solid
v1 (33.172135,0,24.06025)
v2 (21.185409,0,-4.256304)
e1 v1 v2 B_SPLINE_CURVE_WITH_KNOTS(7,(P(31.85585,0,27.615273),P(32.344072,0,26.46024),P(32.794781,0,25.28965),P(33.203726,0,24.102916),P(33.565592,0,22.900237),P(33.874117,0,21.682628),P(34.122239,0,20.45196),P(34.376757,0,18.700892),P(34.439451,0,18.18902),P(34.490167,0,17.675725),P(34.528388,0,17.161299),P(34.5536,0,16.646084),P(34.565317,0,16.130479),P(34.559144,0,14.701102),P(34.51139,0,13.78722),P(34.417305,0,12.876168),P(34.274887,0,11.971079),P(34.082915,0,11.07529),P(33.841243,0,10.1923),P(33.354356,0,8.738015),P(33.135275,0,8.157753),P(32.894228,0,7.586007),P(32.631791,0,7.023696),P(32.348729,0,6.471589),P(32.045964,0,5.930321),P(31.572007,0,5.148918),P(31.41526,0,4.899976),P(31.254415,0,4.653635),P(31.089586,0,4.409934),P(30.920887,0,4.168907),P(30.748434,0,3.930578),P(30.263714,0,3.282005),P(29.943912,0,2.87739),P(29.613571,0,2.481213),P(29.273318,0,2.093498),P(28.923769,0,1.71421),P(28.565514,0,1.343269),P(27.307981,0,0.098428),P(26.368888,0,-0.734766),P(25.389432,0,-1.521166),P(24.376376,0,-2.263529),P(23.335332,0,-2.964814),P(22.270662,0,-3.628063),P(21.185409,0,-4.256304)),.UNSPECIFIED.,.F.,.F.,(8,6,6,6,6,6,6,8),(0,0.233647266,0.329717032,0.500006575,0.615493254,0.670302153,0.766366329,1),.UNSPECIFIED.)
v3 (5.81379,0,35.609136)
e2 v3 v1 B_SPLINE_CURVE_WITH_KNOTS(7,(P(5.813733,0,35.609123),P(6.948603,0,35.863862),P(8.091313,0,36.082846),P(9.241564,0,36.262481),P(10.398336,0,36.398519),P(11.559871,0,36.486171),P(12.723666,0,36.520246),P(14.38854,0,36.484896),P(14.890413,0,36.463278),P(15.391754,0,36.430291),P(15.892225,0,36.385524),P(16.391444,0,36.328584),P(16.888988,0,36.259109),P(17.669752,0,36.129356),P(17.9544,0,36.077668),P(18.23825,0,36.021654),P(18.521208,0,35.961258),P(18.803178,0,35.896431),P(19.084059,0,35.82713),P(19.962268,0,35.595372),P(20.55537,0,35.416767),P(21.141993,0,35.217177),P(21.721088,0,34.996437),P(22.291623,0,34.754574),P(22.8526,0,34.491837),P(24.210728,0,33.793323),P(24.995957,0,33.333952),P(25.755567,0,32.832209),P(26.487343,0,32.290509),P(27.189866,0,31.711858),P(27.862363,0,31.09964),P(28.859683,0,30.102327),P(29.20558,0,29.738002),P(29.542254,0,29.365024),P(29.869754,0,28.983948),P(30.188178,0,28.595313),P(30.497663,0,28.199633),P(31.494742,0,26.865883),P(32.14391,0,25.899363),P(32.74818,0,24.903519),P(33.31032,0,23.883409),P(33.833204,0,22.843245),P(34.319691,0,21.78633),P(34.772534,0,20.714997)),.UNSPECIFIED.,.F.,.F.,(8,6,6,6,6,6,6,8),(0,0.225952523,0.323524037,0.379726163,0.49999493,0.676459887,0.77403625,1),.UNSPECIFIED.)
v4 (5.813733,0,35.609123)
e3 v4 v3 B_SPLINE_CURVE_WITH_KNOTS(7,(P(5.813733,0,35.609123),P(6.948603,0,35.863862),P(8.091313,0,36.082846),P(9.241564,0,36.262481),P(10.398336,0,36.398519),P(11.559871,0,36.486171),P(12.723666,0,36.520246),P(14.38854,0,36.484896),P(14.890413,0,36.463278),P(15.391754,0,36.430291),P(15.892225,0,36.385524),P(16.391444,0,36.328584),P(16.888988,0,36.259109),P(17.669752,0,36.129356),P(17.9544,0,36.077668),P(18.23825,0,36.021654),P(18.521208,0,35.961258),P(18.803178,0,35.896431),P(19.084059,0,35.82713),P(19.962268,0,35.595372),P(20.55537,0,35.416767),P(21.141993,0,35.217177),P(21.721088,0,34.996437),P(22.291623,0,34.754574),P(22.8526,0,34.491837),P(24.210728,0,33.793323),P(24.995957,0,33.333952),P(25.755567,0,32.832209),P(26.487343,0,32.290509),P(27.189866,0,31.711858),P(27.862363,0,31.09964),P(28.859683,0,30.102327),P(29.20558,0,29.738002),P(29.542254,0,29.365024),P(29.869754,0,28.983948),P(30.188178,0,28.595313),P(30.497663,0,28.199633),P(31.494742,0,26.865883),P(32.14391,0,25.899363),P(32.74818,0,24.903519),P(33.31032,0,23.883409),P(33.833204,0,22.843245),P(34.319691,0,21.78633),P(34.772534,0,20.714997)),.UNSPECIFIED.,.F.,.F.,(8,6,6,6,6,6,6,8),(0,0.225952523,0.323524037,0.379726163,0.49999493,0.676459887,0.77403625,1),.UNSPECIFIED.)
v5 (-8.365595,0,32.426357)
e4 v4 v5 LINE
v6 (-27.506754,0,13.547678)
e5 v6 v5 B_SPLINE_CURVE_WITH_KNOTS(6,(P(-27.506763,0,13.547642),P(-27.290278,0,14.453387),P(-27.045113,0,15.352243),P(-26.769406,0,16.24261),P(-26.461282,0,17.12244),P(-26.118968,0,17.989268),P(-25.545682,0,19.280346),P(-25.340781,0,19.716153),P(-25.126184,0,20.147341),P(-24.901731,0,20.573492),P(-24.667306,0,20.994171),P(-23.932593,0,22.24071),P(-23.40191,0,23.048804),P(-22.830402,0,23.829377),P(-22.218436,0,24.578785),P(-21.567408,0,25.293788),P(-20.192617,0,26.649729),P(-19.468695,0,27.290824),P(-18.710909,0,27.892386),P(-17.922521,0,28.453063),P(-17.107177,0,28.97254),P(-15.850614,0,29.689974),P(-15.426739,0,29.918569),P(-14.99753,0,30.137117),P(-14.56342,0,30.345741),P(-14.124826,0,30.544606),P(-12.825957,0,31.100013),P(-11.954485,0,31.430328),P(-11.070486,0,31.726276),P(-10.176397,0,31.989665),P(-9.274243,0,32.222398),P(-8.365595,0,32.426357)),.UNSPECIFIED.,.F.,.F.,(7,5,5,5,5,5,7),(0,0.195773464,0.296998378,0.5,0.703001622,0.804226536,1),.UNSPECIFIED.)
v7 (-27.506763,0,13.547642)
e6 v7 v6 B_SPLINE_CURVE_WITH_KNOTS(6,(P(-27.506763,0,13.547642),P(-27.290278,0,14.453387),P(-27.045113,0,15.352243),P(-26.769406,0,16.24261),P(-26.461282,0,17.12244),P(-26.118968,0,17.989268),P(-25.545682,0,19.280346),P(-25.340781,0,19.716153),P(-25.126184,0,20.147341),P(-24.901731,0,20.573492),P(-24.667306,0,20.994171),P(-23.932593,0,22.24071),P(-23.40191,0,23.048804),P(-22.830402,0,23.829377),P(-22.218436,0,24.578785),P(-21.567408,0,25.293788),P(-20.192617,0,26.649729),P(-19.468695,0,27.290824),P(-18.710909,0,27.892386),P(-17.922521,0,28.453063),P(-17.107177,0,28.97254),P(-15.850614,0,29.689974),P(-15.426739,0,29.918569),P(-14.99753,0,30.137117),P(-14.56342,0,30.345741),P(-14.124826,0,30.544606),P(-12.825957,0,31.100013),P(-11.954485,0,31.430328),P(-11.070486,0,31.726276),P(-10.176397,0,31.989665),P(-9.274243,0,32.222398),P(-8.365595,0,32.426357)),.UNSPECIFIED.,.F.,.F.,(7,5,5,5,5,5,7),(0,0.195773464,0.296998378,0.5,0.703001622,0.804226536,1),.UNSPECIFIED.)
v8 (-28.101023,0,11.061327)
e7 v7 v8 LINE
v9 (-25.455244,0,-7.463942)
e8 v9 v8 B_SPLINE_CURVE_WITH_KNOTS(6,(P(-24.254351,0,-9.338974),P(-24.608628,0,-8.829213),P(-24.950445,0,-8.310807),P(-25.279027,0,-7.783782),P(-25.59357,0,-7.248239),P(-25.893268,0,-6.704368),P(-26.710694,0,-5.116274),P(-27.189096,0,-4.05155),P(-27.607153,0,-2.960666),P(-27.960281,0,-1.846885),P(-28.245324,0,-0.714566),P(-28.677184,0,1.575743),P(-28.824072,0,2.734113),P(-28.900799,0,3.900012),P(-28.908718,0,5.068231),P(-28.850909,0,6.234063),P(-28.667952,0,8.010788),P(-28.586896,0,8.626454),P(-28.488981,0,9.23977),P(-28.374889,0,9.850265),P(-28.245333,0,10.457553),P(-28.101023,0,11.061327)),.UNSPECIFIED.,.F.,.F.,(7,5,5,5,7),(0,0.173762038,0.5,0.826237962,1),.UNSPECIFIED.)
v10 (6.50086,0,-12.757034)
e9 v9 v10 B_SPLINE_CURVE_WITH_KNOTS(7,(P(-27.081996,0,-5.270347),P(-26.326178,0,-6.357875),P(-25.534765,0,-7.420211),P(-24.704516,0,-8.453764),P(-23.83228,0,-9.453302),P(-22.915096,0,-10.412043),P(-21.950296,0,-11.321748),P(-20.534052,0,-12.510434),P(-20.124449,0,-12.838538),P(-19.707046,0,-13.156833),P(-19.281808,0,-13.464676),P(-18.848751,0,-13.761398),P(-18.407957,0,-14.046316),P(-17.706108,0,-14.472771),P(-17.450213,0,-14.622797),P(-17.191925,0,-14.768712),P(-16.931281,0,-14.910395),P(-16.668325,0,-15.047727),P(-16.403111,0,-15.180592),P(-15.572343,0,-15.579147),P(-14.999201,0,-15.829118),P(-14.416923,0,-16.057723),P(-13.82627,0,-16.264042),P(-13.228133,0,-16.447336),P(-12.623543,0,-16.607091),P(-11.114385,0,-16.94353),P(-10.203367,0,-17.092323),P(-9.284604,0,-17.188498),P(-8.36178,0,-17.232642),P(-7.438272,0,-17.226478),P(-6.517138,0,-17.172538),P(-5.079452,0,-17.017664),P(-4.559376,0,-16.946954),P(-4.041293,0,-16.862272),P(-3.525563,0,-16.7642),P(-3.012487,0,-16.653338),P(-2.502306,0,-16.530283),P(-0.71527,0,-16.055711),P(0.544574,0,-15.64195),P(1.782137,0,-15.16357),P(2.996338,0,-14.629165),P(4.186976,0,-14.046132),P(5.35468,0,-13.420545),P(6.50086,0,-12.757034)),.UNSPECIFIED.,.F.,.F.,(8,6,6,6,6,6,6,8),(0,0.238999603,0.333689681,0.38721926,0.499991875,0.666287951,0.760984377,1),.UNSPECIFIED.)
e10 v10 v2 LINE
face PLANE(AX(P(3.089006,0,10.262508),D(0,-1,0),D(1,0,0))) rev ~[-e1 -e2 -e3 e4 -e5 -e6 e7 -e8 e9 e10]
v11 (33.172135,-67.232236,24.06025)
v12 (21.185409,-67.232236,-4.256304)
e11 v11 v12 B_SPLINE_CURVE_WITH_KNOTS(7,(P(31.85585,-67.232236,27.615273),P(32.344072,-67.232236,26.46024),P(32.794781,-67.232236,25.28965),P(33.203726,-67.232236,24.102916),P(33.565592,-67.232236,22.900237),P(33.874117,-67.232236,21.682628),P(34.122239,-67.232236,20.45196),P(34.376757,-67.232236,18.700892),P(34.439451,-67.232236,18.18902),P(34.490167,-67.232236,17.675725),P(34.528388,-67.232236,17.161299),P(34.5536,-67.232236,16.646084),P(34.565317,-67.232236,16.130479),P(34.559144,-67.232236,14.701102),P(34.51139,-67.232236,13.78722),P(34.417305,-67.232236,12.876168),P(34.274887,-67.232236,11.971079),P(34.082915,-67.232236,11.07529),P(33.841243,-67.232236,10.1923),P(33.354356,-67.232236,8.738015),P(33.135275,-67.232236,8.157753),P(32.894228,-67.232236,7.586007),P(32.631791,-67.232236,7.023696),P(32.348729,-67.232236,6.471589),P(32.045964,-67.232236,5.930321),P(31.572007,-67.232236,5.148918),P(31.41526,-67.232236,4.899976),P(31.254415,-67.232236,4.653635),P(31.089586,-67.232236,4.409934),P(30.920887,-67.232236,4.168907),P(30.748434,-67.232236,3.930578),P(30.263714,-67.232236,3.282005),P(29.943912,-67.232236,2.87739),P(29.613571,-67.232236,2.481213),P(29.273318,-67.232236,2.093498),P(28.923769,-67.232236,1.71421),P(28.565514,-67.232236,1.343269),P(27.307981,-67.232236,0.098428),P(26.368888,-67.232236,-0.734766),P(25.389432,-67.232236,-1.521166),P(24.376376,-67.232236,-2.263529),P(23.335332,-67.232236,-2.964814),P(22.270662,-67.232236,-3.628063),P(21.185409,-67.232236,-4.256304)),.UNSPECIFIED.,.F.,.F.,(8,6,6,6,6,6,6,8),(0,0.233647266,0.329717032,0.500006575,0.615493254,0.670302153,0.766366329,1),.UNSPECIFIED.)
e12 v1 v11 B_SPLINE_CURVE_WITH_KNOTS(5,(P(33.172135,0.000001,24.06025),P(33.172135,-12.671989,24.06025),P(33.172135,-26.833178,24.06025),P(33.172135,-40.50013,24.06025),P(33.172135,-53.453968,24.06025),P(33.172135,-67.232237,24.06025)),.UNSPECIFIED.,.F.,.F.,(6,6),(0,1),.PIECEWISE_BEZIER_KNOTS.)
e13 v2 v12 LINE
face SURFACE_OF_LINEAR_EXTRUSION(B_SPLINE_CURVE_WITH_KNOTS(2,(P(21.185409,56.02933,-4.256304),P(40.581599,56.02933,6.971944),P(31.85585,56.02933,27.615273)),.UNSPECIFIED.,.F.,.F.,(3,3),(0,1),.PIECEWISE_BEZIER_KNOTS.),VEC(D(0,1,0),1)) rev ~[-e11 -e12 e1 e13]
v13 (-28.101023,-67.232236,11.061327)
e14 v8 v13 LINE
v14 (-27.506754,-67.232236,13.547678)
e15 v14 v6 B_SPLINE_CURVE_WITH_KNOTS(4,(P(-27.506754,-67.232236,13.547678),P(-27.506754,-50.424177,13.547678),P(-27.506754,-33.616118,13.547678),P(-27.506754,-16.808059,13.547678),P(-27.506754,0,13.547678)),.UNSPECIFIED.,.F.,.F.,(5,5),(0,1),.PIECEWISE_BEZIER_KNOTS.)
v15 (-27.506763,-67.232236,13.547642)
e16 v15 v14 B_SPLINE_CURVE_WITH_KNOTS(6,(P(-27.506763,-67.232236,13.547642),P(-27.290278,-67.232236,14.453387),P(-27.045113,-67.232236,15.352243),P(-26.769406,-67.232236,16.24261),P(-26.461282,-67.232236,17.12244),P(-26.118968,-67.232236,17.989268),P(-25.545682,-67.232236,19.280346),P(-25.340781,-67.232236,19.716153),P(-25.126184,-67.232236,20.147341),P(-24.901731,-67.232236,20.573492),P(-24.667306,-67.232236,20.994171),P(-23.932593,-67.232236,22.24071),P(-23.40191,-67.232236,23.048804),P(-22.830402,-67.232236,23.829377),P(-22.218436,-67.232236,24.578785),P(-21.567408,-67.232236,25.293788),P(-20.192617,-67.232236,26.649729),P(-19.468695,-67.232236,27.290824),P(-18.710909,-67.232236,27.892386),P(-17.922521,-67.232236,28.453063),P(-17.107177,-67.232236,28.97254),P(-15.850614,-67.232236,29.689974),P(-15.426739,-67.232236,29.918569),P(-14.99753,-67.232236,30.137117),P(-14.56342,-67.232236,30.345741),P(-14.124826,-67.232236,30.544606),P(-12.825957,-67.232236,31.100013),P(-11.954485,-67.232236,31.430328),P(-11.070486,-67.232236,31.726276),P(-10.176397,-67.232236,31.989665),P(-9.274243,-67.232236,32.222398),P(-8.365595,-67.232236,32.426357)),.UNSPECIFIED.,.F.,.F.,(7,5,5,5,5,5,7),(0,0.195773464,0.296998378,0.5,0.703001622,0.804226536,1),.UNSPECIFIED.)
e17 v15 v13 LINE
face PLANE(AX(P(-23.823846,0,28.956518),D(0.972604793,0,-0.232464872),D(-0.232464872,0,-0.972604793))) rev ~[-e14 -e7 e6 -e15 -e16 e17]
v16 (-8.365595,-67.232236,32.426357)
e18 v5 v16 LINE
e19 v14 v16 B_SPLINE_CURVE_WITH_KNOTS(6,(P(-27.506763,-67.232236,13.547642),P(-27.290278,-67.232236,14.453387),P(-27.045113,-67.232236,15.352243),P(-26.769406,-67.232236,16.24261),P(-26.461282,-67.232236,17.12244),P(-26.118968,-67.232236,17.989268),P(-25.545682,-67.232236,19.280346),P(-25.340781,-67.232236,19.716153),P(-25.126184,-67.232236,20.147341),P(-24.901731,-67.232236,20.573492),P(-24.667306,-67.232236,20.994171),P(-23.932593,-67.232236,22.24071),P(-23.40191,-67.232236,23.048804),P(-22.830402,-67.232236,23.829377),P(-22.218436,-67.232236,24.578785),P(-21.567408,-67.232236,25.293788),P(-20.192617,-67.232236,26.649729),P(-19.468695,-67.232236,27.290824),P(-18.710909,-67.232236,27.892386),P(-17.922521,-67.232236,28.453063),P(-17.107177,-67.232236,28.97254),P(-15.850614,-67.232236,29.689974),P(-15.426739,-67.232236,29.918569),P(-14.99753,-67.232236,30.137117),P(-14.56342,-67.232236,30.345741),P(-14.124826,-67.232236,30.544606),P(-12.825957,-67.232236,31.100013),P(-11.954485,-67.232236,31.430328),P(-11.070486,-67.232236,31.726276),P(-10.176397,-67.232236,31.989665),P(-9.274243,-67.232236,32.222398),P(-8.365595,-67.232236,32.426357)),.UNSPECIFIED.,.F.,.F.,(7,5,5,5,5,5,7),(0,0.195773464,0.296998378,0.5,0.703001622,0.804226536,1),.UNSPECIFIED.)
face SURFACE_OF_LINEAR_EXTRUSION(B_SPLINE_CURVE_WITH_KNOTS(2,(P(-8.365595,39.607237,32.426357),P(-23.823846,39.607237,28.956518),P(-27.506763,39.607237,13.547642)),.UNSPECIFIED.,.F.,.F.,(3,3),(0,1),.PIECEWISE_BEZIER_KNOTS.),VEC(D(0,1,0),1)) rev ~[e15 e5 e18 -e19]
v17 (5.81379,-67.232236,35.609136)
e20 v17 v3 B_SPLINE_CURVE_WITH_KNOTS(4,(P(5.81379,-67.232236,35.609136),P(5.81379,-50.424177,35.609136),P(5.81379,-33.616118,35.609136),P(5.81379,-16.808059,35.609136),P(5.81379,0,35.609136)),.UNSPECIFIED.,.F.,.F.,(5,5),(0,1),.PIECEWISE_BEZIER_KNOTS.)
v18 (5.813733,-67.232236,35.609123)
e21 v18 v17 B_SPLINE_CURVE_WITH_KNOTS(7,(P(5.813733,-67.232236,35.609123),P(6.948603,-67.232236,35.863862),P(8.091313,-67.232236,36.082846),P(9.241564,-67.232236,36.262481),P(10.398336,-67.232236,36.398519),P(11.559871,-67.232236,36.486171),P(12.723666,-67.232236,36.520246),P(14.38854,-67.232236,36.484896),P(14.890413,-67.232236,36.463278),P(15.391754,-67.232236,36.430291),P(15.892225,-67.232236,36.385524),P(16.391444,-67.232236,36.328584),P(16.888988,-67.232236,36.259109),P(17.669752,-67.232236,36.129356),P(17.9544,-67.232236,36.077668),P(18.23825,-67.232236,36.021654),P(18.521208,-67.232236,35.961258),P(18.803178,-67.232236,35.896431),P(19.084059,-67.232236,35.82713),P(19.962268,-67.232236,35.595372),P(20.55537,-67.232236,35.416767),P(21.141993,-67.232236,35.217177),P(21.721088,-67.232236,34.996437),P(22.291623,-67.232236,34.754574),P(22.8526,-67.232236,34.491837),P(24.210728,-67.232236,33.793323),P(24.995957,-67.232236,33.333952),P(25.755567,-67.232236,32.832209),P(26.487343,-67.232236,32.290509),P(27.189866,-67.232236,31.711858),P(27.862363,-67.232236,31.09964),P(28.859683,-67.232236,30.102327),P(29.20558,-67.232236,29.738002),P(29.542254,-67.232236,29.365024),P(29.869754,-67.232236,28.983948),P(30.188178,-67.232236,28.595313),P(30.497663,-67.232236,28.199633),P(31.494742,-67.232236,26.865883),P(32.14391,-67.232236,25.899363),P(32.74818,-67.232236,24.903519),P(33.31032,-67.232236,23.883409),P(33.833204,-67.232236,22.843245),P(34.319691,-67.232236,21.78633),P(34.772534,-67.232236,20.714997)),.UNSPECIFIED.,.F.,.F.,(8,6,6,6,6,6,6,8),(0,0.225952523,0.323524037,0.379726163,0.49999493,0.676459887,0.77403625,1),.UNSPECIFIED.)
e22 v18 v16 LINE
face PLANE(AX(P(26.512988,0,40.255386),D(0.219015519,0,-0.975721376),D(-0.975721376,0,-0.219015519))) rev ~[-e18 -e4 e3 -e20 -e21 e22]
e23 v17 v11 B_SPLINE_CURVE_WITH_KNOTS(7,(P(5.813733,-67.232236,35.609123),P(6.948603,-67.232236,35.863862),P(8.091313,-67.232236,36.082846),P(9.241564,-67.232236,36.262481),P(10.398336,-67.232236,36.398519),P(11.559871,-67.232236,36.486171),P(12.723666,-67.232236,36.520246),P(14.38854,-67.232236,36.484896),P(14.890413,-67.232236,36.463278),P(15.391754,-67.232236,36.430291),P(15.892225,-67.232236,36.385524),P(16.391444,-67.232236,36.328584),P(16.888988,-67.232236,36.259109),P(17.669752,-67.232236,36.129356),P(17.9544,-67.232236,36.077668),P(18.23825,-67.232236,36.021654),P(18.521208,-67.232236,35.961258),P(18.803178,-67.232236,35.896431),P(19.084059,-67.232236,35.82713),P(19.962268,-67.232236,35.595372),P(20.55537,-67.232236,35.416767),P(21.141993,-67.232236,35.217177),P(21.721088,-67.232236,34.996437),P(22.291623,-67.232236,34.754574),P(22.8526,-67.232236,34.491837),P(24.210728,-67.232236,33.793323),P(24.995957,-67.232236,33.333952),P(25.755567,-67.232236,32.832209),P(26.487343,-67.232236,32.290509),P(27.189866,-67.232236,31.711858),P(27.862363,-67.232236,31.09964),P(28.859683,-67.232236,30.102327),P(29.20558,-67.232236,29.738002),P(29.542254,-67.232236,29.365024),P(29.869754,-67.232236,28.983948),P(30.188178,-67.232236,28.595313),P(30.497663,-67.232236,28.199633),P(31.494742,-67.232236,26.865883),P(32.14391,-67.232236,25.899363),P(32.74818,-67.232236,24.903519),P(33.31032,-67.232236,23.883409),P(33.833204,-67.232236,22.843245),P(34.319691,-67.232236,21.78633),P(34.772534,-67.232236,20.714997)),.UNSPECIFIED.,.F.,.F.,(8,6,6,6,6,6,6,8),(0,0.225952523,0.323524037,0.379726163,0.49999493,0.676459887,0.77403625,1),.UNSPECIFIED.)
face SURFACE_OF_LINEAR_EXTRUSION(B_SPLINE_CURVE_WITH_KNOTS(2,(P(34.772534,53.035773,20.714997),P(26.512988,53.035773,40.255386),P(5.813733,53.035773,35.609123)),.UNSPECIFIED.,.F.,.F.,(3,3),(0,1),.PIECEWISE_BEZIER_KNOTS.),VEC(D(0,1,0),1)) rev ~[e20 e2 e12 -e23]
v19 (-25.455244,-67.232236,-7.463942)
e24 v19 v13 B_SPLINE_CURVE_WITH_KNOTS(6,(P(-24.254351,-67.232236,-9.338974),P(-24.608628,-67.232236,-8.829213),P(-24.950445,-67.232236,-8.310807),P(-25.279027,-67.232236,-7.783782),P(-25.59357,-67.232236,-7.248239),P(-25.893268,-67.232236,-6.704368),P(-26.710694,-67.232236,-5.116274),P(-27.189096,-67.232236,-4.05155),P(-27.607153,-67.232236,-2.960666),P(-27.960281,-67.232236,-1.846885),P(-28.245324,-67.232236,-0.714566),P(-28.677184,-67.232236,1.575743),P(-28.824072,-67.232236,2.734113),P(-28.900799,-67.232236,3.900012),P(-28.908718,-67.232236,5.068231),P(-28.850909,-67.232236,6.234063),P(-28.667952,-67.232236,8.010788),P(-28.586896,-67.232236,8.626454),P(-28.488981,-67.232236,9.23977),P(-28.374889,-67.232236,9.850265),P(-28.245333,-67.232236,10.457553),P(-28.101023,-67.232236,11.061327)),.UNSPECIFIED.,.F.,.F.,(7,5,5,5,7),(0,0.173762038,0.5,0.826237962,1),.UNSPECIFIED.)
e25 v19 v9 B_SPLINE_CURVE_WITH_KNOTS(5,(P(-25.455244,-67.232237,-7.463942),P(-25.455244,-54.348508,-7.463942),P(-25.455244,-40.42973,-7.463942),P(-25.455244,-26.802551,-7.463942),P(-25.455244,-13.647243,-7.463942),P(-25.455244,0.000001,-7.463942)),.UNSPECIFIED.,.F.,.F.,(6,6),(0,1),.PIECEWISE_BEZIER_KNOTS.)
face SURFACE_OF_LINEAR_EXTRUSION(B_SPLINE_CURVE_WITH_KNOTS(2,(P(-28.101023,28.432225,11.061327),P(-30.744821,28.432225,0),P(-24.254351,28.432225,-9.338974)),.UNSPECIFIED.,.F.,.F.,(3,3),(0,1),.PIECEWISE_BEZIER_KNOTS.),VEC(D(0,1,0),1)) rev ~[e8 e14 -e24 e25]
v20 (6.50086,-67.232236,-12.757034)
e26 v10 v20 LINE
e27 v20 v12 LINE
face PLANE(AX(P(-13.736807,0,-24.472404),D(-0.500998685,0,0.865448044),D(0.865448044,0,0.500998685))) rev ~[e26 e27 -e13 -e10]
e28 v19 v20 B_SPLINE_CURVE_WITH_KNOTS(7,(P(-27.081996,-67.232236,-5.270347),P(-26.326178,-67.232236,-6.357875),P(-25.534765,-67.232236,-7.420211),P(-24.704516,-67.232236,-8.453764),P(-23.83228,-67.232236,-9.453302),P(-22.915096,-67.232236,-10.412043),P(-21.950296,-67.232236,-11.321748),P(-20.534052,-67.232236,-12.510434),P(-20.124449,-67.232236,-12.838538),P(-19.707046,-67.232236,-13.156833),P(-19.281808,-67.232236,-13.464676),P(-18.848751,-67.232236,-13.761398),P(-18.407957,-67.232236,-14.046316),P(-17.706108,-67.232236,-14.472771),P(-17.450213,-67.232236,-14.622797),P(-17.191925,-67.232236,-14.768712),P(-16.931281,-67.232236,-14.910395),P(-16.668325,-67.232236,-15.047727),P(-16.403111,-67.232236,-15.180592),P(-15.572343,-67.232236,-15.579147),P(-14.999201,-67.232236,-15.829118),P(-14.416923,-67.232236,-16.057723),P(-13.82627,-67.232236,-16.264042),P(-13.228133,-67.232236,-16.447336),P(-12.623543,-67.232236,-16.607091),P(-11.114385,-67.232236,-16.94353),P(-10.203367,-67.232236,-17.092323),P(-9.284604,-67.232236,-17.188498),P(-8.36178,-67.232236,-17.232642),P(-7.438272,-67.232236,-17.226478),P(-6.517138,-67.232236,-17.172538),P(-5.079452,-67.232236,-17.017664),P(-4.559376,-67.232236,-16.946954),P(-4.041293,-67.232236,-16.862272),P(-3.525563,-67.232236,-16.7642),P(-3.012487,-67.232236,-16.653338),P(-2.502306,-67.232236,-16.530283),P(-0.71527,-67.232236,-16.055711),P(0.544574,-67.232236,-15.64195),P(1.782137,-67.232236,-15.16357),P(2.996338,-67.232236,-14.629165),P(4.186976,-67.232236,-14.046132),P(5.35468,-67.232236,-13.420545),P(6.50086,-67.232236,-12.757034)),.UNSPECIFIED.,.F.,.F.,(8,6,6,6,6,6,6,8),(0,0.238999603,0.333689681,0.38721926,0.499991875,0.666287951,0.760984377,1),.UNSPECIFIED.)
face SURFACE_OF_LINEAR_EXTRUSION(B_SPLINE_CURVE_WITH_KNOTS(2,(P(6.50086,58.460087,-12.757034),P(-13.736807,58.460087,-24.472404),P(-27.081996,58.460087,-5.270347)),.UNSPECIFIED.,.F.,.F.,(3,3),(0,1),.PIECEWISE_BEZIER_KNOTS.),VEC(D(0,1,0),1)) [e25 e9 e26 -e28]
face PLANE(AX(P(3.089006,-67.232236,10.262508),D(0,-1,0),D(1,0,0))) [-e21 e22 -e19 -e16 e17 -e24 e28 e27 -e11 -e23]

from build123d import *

# Parameters (mm, degrees)
F1_DEPTH    = 67.2322362661
F2_T1_DEPTH = 173.3037820945
F2_T3_DEPTH = 146.4467100197
F2_T5_DEPTH = 179.2908953132
F2_T7_DEPTH = 184.152409541
F2_T9_DEPTH = 124.0966869943


# Not quite as in the source:
# - a fillet or chamfer that OpenCascade refuses, or shapes differently, is made with other operations: its cross-section is extruded or revolved along the edge and cut away or added


with BuildPart() as f1:
    # F0 (on Front) → F1 (new body)
    with BuildSketch(Plane.XZ):
        Polygon((-13.7368068099, -24.4724042714), (40.5815988779, 6.9719441235), (26.5129879117, 40.2553863823), (-23.8238461316, 28.9565175772), (-30.7448208332, 0), align=None)
    extrude(amount=F1_DEPTH)

    # F2: fillet of radius 25.4 on 5 edges, made by hand

    # F2_s2 → F2_t1 (cut)
    with BuildSketch(Plane.XZ.offset(-53.0357729142)):
        with BuildLine():
            add(Edge.make_bspline(
                [(34.7725342315, 20.7149972366), (26.5129879117, 40.2553863823), (5.8137329922, 35.6091234589)],
                knots=[0, 0, 0, 1, 1, 1], degree=2, weights=[1, 1, 1]))
            Line((5.8137329922, 35.6091234589), (26.5129879117, 40.2553863823))
            Line((26.5129879117, 40.2553863823), (34.7725342315, 20.7149972366))
        make_face()
    extrude(amount=F2_T1_DEPTH, mode=Mode.SUBTRACT)

    # F2_s4 → F2_t3 (cut)
    with BuildSketch(Plane.XZ.offset(-39.6072368768)):
        with BuildLine():
            add(Edge.make_bspline(
                [(-8.3655950734, 32.426357387), (-23.8238461316, 28.9565175772), (-27.5067626395, 13.5476422101)],
                knots=[0, 0, 0, 1, 1, 1], degree=2, weights=[1, 1, 1]))
            Line((-27.5067626395, 13.5476422101), (-23.8238461316, 28.9565175772))
            Line((-23.8238461316, 28.9565175772), (-8.3655950734, 32.426357387))
        make_face()
    extrude(amount=F2_T3_DEPTH, mode=Mode.SUBTRACT)

    # F2_s6 → F2_t5 (cut)
    with BuildSketch(Plane.XZ.offset(-56.0293295235)):
        with BuildLine():
            add(Edge.make_bspline(
                [(21.185409412, -4.2563040435), (40.5815988779, 6.9719441235), (31.8558498779, 27.6152729996)],
                knots=[0, 0, 0, 1, 1, 1], degree=2, weights=[1, 1, 1]))
            Line((31.8558498779, 27.6152729996), (40.5815988779, 6.9719441235))
            Line((40.5815988779, 6.9719441235), (21.185409412, -4.2563040435))
        make_face()
    extrude(amount=F2_T5_DEPTH, mode=Mode.SUBTRACT)

    # F2_s8 → F2_t7 (cut)
    with BuildSketch(Plane.XZ.offset(-58.4600866374)):
        with BuildLine():
            add(Edge.make_bspline(
                [(6.5008602522, -12.7570336572), (-13.7368068099, -24.4724042714), (-27.081995831, -5.2703469145)],
                knots=[0, 0, 0, 1, 1, 1], degree=2, weights=[1, 1, 1]))
            Line((-27.081995831, -5.2703469145), (-13.7368068099, -24.4724042714))
            Line((-13.7368068099, -24.4724042714), (6.5008602522, -12.7570336572))
        make_face()
    extrude(amount=F2_T7_DEPTH, mode=Mode.SUBTRACT)

    # F2_s10 → F2_t9 (cut)
    with BuildSketch(Plane.XZ.offset(-28.4322253641)):
        with BuildLine():
            add(Edge.make_bspline(
                [(-28.1010233758, 11.0613274641), (-30.7448208332, 0), (-24.2543511196, -9.3389738816)],
                knots=[0, 0, 0, 1, 1, 1], degree=2, weights=[1, 1, 1]))
            Line((-24.2543511196, -9.3389738816), (-30.7448208332, 0))
            Line((-30.7448208332, 0), (-28.1010233758, 11.0613274641))
        make_face()
    extrude(amount=F2_T9_DEPTH, mode=Mode.SUBTRACT)


solid = f1.part
